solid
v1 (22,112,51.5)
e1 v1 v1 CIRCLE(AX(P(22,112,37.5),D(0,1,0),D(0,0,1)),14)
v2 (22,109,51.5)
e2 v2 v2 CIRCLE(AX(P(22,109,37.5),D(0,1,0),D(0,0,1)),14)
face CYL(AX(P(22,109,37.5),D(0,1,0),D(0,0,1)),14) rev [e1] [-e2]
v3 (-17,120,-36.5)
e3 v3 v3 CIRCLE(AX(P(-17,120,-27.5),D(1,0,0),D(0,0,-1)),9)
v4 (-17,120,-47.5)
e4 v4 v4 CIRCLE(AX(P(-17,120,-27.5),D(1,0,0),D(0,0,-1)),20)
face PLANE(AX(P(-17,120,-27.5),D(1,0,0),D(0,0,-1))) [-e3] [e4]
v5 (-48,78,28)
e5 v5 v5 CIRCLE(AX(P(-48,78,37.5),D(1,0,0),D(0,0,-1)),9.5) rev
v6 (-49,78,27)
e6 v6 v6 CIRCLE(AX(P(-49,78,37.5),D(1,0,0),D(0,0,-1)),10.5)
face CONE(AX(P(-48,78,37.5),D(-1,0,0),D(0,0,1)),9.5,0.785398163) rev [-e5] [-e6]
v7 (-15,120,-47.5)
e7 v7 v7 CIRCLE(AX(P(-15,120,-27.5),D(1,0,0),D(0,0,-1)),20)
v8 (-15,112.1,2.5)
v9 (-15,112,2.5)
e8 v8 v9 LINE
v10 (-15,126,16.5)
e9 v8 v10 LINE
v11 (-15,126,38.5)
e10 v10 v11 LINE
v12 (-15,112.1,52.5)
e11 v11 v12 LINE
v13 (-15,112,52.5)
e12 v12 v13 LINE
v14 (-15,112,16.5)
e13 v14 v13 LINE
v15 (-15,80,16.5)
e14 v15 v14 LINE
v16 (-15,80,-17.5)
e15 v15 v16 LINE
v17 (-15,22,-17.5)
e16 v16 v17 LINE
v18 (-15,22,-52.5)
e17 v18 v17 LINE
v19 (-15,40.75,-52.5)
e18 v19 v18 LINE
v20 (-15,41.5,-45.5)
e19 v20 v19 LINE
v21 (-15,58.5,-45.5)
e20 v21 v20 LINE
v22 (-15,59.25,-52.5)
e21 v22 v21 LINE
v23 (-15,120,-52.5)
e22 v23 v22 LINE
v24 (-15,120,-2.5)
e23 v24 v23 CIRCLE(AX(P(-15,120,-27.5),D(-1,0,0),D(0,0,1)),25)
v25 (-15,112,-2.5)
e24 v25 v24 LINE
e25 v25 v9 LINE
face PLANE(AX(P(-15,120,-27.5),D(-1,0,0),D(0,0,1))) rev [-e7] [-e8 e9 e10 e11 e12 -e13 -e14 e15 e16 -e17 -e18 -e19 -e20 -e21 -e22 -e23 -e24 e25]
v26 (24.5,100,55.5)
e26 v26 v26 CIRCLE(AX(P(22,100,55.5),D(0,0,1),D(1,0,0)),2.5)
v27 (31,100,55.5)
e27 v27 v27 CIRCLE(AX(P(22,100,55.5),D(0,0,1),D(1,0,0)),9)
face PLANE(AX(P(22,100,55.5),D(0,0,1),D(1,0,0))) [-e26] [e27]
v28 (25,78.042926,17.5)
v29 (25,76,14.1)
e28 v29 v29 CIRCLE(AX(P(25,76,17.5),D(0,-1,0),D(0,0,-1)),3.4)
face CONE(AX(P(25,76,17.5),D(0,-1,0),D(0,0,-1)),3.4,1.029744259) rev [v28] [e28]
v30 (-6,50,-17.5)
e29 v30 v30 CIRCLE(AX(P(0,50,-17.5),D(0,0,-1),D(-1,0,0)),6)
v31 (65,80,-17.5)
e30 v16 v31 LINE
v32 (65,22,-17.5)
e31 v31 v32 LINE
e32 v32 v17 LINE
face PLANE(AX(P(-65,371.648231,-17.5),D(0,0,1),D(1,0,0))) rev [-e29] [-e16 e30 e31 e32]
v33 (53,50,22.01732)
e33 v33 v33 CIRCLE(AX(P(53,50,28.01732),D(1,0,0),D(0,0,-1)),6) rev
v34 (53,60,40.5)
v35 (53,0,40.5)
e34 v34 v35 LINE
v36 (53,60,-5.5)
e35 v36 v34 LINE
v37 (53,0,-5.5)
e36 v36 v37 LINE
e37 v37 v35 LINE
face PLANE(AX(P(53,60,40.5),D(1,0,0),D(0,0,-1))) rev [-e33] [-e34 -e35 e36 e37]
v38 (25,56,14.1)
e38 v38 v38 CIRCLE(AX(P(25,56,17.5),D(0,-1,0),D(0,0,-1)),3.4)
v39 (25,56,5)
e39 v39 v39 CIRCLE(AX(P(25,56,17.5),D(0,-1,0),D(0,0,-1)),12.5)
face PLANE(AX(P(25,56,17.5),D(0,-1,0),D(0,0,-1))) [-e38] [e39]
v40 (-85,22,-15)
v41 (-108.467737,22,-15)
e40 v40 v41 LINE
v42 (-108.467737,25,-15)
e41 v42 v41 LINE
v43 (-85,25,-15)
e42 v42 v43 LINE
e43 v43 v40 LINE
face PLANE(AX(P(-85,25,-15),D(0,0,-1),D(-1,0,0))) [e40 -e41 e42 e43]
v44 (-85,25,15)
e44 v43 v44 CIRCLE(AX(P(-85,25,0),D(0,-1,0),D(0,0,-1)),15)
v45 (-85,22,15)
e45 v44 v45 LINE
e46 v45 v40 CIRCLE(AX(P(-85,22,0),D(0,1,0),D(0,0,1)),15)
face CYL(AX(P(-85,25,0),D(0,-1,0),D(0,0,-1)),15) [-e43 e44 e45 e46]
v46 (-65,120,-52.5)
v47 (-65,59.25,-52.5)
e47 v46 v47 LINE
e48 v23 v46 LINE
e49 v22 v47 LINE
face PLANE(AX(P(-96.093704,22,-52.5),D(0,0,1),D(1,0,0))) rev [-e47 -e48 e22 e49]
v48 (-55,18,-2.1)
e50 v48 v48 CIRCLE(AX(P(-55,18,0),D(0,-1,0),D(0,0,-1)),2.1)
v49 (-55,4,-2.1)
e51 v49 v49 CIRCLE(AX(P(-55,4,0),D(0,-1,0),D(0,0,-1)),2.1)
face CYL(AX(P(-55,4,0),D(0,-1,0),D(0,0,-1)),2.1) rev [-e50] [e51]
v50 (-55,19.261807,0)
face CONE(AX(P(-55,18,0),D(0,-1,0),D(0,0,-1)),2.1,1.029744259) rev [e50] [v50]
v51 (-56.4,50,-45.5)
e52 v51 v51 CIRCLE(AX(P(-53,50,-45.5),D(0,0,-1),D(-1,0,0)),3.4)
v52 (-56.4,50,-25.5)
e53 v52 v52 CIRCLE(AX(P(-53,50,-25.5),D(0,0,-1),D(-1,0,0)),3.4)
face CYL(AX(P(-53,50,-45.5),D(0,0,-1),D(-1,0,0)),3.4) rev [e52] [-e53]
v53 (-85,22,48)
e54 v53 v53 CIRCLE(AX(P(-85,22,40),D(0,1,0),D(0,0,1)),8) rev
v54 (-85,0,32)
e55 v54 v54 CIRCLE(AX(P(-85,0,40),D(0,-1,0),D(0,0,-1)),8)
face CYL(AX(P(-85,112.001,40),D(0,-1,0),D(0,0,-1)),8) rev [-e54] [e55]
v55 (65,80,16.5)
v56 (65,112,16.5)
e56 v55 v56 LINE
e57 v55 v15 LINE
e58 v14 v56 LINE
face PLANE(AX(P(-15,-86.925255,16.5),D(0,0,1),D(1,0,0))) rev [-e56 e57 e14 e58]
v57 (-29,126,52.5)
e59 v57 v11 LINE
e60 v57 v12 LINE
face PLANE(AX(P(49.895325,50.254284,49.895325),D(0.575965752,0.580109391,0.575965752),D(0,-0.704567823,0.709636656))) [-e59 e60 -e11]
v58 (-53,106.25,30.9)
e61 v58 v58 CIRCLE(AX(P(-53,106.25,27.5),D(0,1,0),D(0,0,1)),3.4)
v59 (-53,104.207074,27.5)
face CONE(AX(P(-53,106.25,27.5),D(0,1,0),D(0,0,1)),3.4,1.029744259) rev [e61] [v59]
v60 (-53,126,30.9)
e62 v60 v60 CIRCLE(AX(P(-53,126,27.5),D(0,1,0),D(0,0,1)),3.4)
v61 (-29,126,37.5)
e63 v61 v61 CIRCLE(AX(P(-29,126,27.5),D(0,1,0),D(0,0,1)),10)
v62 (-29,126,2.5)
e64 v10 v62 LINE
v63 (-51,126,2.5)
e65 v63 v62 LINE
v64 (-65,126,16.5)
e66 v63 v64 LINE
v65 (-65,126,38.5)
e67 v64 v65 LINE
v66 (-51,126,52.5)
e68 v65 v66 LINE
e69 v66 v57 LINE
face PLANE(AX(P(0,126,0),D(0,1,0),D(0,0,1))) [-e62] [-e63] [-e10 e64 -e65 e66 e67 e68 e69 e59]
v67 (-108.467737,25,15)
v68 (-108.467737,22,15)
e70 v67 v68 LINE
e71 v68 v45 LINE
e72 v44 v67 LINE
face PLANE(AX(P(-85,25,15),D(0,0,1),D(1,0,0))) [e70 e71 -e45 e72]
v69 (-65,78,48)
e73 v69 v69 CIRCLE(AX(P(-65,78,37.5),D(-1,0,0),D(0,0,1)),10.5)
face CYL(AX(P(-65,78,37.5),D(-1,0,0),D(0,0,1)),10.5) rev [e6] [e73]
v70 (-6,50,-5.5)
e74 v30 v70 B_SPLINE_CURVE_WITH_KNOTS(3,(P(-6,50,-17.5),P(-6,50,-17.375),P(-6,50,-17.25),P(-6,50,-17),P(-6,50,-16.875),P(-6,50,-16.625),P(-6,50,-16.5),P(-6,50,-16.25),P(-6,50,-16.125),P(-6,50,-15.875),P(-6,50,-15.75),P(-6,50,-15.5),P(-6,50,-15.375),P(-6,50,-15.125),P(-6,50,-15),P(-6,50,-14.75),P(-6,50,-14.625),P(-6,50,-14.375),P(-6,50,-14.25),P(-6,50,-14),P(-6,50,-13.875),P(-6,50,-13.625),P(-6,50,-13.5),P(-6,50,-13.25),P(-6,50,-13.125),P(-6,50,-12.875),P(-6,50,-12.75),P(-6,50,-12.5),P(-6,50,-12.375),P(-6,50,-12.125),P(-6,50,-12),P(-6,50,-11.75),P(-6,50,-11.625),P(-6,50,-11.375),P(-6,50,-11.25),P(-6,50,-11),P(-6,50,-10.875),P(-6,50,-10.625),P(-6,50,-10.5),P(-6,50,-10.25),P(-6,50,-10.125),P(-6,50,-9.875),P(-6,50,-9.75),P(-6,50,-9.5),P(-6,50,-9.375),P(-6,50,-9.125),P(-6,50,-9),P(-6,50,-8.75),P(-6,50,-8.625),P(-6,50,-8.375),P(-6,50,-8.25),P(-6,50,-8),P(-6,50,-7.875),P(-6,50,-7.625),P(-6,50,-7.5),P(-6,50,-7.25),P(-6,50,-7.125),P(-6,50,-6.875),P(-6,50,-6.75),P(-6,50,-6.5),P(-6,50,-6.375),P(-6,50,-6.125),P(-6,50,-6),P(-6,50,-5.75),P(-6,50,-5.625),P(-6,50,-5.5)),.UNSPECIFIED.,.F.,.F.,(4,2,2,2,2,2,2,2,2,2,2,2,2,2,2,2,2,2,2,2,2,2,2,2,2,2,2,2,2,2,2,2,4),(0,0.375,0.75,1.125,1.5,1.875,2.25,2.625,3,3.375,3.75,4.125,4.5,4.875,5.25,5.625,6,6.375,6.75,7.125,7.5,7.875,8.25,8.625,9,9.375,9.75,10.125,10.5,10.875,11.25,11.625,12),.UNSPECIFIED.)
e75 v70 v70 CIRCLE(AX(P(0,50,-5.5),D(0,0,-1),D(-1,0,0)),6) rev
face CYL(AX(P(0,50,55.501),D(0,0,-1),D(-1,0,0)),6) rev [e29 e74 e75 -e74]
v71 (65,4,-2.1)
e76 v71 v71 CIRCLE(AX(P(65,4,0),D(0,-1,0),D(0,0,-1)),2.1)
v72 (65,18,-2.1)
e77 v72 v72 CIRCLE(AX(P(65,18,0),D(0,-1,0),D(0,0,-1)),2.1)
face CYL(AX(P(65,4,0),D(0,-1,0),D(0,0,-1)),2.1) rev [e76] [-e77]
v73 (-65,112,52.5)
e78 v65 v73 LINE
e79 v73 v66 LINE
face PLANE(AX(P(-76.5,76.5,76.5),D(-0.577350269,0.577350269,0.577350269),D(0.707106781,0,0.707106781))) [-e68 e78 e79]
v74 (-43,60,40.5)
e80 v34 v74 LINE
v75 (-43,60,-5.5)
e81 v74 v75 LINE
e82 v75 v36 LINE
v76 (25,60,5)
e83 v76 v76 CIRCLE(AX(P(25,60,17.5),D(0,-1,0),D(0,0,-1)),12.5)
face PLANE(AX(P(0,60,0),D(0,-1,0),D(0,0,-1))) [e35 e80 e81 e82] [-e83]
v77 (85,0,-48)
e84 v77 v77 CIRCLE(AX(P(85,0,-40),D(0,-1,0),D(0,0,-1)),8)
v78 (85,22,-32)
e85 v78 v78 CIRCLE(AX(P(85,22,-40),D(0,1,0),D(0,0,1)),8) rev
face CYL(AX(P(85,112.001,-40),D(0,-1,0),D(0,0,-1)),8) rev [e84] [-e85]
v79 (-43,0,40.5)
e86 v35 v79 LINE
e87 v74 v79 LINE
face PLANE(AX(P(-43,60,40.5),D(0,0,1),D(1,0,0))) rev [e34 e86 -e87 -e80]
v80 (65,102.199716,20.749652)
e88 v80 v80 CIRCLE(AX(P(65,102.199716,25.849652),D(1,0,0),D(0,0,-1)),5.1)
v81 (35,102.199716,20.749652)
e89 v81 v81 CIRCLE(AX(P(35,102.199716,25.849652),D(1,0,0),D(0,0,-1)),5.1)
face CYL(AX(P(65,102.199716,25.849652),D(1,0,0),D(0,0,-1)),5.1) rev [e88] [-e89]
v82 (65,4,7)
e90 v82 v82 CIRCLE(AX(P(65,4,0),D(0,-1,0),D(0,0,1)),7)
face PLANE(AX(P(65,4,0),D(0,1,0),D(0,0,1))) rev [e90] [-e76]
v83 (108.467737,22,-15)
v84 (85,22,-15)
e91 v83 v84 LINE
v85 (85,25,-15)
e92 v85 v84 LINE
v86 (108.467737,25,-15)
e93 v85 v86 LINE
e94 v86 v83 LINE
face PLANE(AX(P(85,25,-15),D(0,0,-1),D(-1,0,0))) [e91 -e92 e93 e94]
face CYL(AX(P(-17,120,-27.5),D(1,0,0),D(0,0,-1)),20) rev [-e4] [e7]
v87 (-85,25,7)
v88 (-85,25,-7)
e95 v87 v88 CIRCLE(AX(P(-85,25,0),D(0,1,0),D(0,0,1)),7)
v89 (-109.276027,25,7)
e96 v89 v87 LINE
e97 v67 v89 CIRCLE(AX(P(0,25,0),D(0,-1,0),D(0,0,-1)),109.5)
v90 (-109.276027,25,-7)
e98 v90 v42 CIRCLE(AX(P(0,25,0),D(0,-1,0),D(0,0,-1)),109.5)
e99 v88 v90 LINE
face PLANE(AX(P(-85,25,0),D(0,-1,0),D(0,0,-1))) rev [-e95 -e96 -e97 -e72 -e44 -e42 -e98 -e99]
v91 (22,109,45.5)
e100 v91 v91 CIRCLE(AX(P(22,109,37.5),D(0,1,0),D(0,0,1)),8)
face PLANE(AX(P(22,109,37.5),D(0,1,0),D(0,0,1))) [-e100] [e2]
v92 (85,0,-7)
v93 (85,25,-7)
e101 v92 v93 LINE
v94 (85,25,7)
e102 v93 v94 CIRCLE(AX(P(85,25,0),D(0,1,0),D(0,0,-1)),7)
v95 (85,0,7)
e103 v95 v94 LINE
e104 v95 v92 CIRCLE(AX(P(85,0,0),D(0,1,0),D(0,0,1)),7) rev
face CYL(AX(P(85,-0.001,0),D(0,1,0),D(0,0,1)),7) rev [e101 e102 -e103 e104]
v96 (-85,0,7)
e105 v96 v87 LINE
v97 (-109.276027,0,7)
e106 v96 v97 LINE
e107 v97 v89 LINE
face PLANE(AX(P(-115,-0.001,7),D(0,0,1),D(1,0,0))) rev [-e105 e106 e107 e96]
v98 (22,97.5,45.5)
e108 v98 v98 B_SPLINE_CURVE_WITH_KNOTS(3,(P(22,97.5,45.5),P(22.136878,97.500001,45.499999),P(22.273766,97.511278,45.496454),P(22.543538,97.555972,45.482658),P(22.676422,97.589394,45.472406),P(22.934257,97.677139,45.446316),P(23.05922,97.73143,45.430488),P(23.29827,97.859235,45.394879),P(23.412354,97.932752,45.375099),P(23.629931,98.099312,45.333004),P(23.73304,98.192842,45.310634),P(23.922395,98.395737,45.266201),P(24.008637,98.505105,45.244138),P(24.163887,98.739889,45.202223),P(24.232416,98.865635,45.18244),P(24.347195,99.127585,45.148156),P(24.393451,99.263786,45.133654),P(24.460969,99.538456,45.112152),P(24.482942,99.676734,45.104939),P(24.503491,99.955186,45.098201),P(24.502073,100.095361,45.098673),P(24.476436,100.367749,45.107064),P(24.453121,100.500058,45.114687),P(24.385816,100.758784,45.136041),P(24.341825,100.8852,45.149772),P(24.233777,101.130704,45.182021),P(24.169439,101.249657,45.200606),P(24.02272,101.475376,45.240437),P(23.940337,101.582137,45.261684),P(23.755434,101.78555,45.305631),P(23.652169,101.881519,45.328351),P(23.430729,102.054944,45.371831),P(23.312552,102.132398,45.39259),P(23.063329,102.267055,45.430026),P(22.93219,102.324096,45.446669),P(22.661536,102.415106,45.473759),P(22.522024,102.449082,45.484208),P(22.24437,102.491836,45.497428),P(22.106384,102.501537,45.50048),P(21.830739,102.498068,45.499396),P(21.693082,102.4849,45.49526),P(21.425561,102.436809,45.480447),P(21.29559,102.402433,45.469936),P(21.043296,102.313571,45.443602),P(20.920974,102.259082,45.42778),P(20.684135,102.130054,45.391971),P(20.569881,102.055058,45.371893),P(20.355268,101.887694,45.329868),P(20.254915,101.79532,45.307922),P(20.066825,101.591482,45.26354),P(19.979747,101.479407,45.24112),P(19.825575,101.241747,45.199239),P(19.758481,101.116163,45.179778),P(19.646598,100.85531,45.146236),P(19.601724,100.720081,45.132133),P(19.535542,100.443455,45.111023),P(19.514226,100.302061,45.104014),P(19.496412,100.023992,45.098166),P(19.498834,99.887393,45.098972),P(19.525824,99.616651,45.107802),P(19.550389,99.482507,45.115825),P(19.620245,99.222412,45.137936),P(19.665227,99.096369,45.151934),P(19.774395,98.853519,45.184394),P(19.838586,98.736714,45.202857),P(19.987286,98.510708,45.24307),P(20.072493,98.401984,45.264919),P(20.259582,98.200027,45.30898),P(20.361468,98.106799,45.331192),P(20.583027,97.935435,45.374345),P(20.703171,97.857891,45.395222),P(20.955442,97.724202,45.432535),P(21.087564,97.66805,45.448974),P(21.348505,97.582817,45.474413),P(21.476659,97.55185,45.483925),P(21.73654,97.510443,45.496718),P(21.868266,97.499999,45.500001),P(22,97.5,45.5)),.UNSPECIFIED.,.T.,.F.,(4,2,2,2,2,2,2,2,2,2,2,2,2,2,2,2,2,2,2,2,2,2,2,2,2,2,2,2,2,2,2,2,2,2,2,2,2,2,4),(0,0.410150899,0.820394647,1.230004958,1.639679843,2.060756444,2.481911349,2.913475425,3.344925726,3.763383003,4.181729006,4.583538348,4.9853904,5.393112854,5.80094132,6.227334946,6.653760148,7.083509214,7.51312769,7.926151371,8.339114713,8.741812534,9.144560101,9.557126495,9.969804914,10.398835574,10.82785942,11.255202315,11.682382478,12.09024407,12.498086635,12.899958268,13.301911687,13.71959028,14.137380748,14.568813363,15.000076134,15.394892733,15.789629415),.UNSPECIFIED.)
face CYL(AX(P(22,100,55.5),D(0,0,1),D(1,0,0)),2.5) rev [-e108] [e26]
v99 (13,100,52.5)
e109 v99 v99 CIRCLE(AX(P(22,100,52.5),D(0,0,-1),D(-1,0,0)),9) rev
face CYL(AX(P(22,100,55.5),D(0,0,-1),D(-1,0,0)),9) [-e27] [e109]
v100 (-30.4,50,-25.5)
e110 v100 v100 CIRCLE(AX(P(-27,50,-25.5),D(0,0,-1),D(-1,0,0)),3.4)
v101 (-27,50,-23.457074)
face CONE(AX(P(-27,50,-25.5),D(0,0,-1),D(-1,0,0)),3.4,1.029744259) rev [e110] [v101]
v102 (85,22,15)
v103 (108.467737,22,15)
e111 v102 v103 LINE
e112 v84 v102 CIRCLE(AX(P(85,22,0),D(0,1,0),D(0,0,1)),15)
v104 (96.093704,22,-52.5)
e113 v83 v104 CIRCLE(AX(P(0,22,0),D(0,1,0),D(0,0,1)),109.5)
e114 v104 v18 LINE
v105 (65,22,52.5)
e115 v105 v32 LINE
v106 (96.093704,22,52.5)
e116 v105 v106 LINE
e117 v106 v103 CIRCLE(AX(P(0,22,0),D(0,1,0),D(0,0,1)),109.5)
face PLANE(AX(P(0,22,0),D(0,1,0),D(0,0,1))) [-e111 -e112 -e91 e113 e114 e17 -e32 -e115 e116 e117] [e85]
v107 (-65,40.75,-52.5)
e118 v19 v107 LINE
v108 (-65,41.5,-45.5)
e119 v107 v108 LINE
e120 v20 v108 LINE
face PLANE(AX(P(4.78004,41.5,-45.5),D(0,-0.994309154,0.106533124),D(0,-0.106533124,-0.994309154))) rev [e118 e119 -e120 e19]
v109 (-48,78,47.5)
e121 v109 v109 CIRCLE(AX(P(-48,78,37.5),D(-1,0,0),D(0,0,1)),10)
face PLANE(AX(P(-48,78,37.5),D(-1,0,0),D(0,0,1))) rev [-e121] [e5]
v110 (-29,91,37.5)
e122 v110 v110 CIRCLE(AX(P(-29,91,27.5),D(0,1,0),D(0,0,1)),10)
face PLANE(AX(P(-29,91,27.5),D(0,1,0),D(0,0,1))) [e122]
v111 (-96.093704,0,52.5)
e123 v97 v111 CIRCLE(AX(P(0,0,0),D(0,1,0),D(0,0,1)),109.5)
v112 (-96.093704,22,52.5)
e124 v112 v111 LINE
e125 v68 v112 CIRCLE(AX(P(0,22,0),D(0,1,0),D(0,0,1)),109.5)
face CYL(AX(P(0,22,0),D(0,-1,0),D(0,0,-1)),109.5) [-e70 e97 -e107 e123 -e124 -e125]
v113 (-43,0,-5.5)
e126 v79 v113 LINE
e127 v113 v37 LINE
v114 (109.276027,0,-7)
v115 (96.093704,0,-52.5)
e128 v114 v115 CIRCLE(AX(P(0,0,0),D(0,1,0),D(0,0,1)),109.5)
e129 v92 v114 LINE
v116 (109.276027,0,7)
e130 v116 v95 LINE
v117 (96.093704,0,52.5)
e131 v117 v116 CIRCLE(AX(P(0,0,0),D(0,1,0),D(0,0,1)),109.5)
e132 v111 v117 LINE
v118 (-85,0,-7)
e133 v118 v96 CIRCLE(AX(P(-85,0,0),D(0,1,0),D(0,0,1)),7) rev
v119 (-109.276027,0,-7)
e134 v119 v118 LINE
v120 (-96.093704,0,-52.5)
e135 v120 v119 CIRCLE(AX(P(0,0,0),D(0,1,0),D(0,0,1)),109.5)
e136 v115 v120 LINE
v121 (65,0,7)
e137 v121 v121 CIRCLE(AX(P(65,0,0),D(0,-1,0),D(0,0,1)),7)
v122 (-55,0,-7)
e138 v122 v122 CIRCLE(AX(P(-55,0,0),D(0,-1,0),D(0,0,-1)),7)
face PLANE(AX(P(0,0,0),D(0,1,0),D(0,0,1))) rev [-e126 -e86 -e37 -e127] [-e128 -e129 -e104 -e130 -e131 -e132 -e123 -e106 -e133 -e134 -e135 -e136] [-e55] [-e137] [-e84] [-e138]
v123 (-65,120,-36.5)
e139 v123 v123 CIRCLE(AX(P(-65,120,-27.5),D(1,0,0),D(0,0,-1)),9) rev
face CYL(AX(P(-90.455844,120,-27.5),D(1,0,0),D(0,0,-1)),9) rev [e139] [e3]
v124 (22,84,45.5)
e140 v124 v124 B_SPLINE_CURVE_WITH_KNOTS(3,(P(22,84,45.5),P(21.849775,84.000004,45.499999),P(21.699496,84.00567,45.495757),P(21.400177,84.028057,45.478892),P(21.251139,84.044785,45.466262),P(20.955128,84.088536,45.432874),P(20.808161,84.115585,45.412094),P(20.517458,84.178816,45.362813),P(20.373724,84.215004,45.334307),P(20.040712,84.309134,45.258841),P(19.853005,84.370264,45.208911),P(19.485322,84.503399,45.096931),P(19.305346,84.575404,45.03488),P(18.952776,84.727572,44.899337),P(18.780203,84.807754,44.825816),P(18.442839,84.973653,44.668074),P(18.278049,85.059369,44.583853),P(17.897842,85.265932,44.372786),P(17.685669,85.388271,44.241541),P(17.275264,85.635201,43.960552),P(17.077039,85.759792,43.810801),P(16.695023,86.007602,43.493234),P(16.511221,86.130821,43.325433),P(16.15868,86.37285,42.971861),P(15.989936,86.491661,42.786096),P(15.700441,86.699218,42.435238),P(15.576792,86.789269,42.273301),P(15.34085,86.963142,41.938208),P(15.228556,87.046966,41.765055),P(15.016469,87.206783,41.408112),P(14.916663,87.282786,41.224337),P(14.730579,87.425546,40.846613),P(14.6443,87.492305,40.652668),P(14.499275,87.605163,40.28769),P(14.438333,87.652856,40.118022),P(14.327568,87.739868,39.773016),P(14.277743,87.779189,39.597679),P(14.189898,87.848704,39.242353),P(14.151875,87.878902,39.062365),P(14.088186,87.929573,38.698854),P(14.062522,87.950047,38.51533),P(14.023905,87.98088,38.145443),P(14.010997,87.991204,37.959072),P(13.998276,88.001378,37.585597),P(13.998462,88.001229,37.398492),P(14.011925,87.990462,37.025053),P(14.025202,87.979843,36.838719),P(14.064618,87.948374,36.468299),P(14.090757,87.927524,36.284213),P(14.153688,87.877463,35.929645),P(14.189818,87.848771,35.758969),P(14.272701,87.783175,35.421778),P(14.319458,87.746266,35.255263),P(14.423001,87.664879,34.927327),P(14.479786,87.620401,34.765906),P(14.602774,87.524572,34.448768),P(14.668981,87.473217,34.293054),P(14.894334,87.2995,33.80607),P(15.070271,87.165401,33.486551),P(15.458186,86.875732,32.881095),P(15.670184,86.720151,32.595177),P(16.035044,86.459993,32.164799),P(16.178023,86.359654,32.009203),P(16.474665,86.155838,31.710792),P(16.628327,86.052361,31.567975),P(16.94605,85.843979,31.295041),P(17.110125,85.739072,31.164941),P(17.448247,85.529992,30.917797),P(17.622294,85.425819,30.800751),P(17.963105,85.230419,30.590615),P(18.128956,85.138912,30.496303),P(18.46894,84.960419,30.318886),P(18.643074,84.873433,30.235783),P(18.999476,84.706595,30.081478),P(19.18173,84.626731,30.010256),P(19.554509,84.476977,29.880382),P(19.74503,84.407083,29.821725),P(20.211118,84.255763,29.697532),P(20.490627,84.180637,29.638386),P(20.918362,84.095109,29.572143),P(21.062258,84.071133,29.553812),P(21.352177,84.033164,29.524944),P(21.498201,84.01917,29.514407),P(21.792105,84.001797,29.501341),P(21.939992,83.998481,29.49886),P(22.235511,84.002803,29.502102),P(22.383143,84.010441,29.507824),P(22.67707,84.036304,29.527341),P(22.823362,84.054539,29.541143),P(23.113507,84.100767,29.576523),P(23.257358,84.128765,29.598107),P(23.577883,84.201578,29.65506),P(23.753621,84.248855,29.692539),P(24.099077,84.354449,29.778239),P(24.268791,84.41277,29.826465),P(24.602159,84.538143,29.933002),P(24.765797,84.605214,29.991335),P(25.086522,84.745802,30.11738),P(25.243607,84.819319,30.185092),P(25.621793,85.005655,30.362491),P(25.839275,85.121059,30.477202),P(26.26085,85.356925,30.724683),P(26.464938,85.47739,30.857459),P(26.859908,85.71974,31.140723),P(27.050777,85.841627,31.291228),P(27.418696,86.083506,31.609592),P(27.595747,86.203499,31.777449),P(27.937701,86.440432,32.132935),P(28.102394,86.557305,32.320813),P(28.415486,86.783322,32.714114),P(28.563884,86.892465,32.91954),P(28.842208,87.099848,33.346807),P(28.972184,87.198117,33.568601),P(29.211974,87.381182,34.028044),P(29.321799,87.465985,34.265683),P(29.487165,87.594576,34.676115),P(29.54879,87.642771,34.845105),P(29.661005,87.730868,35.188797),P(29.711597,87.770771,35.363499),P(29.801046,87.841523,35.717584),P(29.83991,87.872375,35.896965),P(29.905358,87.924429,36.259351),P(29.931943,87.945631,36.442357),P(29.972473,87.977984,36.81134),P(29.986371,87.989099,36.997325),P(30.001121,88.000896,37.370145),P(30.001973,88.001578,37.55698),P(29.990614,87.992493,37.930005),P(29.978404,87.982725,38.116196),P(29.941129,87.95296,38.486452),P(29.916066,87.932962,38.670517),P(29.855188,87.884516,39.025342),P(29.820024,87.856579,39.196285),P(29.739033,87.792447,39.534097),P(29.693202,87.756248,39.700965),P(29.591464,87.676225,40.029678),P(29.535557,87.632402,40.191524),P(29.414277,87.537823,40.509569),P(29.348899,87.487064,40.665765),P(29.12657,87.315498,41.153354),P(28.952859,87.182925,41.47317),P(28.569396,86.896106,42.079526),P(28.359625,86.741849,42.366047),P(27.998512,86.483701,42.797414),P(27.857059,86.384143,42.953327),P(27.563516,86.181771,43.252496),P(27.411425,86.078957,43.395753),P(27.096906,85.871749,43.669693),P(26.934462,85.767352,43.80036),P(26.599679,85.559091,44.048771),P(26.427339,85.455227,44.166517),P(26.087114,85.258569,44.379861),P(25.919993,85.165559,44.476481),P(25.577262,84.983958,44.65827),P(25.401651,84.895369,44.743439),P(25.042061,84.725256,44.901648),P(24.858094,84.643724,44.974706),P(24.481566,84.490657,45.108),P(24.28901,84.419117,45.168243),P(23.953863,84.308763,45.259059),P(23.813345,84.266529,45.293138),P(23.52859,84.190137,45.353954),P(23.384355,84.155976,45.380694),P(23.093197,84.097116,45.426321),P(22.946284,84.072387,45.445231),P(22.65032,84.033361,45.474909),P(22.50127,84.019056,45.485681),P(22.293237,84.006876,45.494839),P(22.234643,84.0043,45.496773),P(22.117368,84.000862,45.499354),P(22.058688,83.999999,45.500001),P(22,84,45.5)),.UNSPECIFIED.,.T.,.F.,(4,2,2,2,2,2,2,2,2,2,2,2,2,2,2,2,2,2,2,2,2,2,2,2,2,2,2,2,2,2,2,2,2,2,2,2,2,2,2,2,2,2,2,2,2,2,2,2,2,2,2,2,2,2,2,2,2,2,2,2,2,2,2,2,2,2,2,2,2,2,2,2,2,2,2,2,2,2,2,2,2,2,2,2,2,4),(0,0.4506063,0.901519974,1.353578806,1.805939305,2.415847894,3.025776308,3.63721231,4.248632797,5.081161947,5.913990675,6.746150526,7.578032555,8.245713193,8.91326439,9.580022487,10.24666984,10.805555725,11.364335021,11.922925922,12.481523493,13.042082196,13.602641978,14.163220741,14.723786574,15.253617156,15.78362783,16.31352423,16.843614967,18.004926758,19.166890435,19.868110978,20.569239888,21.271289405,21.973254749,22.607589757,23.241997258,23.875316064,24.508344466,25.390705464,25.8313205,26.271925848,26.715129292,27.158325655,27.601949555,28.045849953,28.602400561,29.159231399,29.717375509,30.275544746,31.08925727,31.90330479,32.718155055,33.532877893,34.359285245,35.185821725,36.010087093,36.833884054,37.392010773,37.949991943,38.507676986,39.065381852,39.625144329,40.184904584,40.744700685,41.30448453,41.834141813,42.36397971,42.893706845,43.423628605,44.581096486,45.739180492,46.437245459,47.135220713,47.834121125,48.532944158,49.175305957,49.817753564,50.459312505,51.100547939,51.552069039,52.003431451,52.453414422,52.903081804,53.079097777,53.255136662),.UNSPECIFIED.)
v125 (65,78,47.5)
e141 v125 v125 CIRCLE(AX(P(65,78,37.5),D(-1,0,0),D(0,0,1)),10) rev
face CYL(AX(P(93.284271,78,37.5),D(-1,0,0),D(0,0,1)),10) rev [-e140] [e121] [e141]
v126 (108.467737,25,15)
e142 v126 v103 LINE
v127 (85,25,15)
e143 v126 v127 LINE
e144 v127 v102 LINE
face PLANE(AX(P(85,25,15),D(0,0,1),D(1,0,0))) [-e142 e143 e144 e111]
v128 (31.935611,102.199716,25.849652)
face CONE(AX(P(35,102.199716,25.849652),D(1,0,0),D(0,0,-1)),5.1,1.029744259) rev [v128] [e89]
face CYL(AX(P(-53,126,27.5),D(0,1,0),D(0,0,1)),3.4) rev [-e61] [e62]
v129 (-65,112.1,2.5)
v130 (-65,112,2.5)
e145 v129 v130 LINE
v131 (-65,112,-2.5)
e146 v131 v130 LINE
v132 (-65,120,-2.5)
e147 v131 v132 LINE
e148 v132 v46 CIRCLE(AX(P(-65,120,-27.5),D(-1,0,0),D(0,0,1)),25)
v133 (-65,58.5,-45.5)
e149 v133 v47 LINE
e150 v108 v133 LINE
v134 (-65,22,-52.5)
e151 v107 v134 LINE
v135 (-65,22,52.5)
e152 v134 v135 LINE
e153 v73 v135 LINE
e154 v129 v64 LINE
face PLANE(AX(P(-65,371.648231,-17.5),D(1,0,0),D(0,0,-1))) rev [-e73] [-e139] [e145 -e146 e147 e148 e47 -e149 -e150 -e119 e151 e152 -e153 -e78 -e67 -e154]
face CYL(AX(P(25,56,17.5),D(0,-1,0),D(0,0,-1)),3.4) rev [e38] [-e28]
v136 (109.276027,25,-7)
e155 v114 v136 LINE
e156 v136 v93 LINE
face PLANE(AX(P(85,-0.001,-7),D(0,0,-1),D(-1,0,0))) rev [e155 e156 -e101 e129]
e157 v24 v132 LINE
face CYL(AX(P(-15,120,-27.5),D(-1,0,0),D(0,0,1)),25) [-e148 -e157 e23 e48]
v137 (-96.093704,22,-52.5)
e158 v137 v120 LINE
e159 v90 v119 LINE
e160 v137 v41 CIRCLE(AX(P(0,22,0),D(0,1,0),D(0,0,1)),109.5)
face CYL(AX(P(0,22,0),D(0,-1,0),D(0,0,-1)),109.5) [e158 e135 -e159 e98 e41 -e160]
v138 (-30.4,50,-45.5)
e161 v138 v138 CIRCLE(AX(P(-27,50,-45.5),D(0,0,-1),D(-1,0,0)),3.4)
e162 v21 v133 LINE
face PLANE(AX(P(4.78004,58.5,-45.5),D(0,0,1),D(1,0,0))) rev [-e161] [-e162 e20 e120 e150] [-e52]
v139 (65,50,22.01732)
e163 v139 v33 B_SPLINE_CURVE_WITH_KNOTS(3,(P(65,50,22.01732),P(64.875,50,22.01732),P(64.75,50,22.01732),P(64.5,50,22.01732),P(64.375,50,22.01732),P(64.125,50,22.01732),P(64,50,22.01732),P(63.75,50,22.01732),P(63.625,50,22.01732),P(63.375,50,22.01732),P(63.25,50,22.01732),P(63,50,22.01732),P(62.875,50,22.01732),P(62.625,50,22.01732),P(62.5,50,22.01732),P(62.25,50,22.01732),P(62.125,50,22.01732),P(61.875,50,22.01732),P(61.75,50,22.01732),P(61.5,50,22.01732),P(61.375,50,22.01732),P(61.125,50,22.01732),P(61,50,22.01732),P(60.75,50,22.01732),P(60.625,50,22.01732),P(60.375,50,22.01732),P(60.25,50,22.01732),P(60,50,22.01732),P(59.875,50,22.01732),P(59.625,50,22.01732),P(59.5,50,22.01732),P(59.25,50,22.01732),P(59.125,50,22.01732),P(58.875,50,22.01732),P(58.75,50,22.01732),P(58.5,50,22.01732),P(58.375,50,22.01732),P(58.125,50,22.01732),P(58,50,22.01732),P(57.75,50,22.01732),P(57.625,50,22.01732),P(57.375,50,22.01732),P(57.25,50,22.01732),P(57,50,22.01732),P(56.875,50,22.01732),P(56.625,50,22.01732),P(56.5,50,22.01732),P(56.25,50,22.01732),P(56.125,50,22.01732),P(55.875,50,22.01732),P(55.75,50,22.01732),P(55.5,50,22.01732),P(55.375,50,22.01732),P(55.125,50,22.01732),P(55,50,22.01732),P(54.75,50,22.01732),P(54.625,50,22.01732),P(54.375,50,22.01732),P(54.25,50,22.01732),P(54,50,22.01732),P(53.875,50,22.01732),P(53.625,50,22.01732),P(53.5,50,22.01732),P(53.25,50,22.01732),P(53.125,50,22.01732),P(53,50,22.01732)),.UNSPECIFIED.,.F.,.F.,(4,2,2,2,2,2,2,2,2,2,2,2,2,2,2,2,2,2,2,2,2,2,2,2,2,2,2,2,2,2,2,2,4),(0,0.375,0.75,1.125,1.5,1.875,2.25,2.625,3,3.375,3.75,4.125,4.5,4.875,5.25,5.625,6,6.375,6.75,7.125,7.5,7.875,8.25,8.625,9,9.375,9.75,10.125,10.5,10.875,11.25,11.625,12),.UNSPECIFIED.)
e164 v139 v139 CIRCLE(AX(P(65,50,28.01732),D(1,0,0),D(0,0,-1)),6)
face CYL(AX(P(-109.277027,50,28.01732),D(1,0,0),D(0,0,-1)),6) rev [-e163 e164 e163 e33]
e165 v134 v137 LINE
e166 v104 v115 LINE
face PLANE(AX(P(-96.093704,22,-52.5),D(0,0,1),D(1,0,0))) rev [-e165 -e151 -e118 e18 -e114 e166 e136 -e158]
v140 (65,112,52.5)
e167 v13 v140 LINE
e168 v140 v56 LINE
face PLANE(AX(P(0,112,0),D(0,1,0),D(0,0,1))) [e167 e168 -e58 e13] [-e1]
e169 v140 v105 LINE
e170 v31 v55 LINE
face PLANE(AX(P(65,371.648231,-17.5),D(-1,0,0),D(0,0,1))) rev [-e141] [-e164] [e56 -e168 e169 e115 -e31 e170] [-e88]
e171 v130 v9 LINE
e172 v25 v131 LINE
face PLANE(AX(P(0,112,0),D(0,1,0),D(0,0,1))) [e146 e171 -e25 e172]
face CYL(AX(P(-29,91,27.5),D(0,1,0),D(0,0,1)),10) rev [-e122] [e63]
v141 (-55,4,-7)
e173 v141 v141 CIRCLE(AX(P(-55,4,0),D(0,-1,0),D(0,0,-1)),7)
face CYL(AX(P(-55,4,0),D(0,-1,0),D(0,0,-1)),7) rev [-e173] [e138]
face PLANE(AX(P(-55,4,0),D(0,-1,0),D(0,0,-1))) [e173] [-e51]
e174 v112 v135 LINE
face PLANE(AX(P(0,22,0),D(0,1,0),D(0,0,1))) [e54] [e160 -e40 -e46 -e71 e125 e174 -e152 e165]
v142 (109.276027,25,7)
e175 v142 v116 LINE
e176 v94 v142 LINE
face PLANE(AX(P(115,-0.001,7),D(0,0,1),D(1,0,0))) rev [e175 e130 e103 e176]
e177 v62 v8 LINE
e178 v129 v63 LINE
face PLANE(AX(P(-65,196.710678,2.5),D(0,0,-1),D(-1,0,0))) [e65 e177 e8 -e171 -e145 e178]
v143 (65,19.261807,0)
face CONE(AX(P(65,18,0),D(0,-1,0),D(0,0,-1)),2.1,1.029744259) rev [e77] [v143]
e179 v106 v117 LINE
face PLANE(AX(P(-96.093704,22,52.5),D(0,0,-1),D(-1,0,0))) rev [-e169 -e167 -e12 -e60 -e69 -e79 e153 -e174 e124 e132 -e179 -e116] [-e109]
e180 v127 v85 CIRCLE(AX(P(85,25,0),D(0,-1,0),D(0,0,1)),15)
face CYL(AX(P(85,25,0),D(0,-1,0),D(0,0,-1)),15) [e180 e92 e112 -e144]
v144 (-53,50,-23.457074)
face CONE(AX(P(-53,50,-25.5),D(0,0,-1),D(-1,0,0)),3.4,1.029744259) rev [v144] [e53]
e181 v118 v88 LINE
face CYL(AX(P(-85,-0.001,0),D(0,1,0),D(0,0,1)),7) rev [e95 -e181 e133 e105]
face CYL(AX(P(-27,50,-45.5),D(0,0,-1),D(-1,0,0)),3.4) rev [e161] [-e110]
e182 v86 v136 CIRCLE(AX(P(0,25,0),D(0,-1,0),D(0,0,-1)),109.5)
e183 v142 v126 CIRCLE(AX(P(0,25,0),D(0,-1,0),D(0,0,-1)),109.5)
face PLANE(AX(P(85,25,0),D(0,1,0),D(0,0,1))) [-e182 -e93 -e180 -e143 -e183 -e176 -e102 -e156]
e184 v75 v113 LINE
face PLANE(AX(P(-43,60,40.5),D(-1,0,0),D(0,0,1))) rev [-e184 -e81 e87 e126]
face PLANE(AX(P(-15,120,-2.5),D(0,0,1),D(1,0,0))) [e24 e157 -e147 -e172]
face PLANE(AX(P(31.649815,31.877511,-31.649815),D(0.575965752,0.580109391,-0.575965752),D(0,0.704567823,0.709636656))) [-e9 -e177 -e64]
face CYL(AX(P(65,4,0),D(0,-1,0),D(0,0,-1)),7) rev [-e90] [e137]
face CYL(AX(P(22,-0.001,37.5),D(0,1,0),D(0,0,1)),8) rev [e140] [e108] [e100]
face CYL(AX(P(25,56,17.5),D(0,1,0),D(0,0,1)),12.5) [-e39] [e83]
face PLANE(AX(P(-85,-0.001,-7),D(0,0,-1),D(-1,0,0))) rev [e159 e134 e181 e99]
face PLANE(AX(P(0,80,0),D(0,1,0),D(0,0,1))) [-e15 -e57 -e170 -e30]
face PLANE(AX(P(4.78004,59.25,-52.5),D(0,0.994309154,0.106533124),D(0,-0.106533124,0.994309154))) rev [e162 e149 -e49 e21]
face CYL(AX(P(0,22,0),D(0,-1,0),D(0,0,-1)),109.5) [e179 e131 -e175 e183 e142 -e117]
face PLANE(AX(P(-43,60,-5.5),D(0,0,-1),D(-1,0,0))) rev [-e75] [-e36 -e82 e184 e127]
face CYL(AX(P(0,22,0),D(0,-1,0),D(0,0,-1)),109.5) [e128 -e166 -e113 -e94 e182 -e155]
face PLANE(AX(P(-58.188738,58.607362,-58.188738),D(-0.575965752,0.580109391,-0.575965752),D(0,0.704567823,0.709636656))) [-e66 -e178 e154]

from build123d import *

# Parameters (mm, degrees)
EXTRUDE_1_DEPTH          = 22
SKETCH_2_W               = 130
SKETCH_2_H               = 70
EXTRUDE_2_DEPTH          = 90
CUT_EXTRUDE_2_REACH      = 167.198
SKETCH_4_R               = 8
EXTRUDE_3_DEPTH          = 50
SKETCH_6_W               = 50
SKETCH_6_H               = 50
EXTRUDE_4_DEPTH          = 14
CHAMFER_START            = -142
CHAMFER_1_OUTLINE_W      = 20
CHAMFER_1_OUTLINE_H      = 22
CHAMFER_1_DEPTH          = 9.498113221
CHAMFER_START_2          = 86.62897838
CHAMFER_2_DEPTH          = 9.37102162
CHAMFER_START_3          = -134.90192828
CHAMFER_3_DEPTH          = 45.34578231
CHAMFER_START_4          = 32.785213501
CHAMFER_4_DEPTH          = 35.552289575
SKETCH_8_W               = 80
SKETCH_8_H               = 34
CUT_EXTRUDE_3_DEPTH      = 32
SKETCH_9_R               = 20
CUT_EXTRUDE_4_DEPTH      = 2
SKETCH_10_R              = 9
CUT_EXTRUDE_5_DEPTH      = 48
CUT_EXTRUDE_6_DEPTH      = 50
HOLE_WIZARD_M24_2_D      = 21
HOLE_WIZARD_M24_2_DEPTH  = 17
CHAMFER_5_SIZE           = 1
SKETCH_17_R              = 10
CUT_EXTRUDE_7_DEPTH      = 113
SKETCH_18_R              = 14
CUT_EXTRUDE_8_DEPTH      = 3
CUT_EXTRUDE_9_REACH      = 165.179
CUT_EXTRUDE_9_END_RADIUS = 10
SKETCH_19_R              = 8
EXTRUDE_5_DEPTH          = 25
CUT_EXTRUDE_10_REACH     = 172.723
SKETCH_3_W               = 96
SKETCH_3_H               = 46
CUT_EXTRUDE_1_DEPTH      = 60
SKETCH_22_R              = 12.5
EXTRUDE_6_DEPTH          = 4
HOLE_WIZARD_M8_1_D       = 6.8
HOLE_WIZARD_M8_1_DEPTH   = 20
HOLE_WIZARD_M8_1_TIP     = 2.042926105
SKETCH_24_R              = 9
EXTRUDE_7_DEPTH          = 3
SKETCH_28_R              = 10
CUT_EXTRUDE_11_DEPTH     = 35
HOLE_WIZARD_M6_1_REACH   = 199.224
HOLE_WIZARD_M6_1_BORE_R  = 2.5
CUT_EXTRUDE_12_REACH     = 197.692
SKETCH_39_R              = 6
SKETCH_40_R              = 7
CUT_EXTRUDE_13_DEPTH     = 4
HOLE_WIZARD_M5_1_D       = 4.2
HOLE_WIZARD_M5_1_DEPTH   = 14
HOLE_WIZARD_M5_1_TIP     = 1.2618073
CUT_EXTRUDE_14_REACH     = 235.404
SKETCH_44_R              = 6


with BuildPart() as part:
    # 草图1 → 凸台-拉伸1 (new body)
    with BuildSketch(Plane(origin=(0, 0, 0), x_dir=(1, 0, 0), z_dir=(0, 1, 0))):
        with BuildLine():
            Line((-96.093704268, 52.5), (96.093704268, 52.5))
            ThreePointArc((96.093704268, 52.5), (109.5, 0), (96.093704268, -52.5))
            Line((96.093704268, -52.5), (-96.093704268, -52.5))
            ThreePointArc((-96.093704268, -52.5), (-109.5, 0), (-96.093704268, 52.5))
        make_face()
    extrude(amount=EXTRUDE_1_DEPTH)

    # 草图2 → 凸台-拉伸2 (add)
    with BuildSketch(Plane(origin=(0, 22, 0), x_dir=(1, 0, 0), z_dir=(0, 1, 0))):
        with Locations((0, -17.5)):
            Rectangle(SKETCH_2_W, SKETCH_2_H)
    extrude(amount=EXTRUDE_2_DEPTH)

    # 草图4 → 切除-拉伸2 (cut, up to next)
    with BuildSketch(Plane.XZ, mode=Mode.PRIVATE) as cut_extrude_2_sk1:
        with Locations(Location((85, -40, 0), (0, 0, 270))):
            Circle(SKETCH_4_R)
    cut_extrude_2_tool1 = extrude(cut_extrude_2_sk1.sketch, amount=-CUT_EXTRUDE_2_REACH, mode=Mode.PRIVATE) & part.part
    # 草图4 → 切除-拉伸2 (cut, up to next)
    with BuildSketch(Plane.XZ, mode=Mode.PRIVATE) as cut_extrude_2_sk2:
        with Locations(Location((-85, 40, 0), (0, 0, 270))):
            Circle(SKETCH_4_R)
    cut_extrude_2_tool2 = extrude(cut_extrude_2_sk2.sketch, amount=-CUT_EXTRUDE_2_REACH, mode=Mode.PRIVATE) & part.part
    add(cut_extrude_2_tool1.solids().sort_by_distance((85, 0, -40))[0], mode=Mode.SUBTRACT)
    add(cut_extrude_2_tool2.solids().sort_by_distance((-85, 0, 40))[0], mode=Mode.SUBTRACT)

    # 草图5 → 凸台-拉伸3 (add)
    with BuildSketch(Plane.ZY.offset(65)):
        with BuildLine():
            Line((52.5, 22), (-52.5, 22))
            Line((-52.5, 22), (-52.5, 120))
            ThreePointArc((-52.5, 120), (-27.5, 145), (-2.5, 120))
            Line((-2.5, 120), (-2.5, 112))
            Line((-2.5, 112), (52.5, 112))
            Line((52.5, 112), (52.5, 22))
        make_face()
    extrude(amount=-EXTRUDE_3_DEPTH)

    # 草图6 → 凸台-拉伸4 (add)
    with BuildSketch(Plane(origin=(0, 112, 0), x_dir=(1, 0, 0), z_dir=(0, 1, 0))):
        with Locations((-40, -27.5)):
            Rectangle(SKETCH_6_W, SKETCH_6_H)
    extrude(amount=EXTRUDE_4_DEPTH)

    # 倒角1: read off the stored shape, not the designer's step
    # 倒角1 outline → 倒角1 (cut)
    with BuildSketch(Plane(origin=(0, 0, 0), x_dir=(0.8164965809277258, 0.40824829046386313, 0.40824829046386313), z_dir=(0.5773502691896258, -0.5773502691896258, -0.5773502691896258)).offset(CHAMFER_START)):
        with Locations((23, -52)):
            Rectangle(CHAMFER_1_OUTLINE_W, CHAMFER_1_OUTLINE_H)
    extrude(amount=CHAMFER_1_DEPTH, mode=Mode.SUBTRACT)

    # 倒角2: read off the stored shape, not the designer's step
    # 倒角2 outline → 倒角2 (cut)
    with BuildSketch(Plane(origin=(0, 0, 0), x_dir=(0.8174738237346374, -0.40872641016099387, -0.40580693580270144), z_dir=(0.5759657520275584, 0.5801093905313534, 0.5759657520275585)).offset(CHAMFER_START_2)):
        Polygon((-79.385202065, 41.726128481), (-79.385202065, 61.454534398), (-96.511132698, 51.519621216), align=None)
    extrude(amount=CHAMFER_2_DEPTH, mode=Mode.SUBTRACT)

    # 倒角3: read off the stored shape, not the designer's step
    # 倒角3 outline → 倒角3 (cut)
    with BuildSketch(Plane(origin=(0, 0, 0), x_dir=(0.7045678226077661, 0.7096366558639369, 0), z_dir=(0.7096366558639368, -0.7045678226077663, 0)).offset(CHAMFER_START_3)):
        Polygon((78.8457013, 16.5), (68.981751783, 2.5), (80, 2.5), (80, 18), (79.902553034, 18), align=None)
    extrude(amount=CHAMFER_3_DEPTH, mode=Mode.SUBTRACT)

    # 倒角4: read off the stored shape, not the designer's step
    # 倒角4 outline → 倒角4 (cut)
    with BuildSketch(Plane(origin=(0, 0, 0), x_dir=(0.7045678226077663, -0.7096366558639366, 0), z_dir=(0.7096366558639366, 0.7045678226077662, 0)).offset(CHAMFER_START_4)):
        Polygon((-135.211127108, -16.5), (-125.347177592, -2.5), (-137, -2.5), (-137, -18), (-136.267978842, -18), align=None)
    extrude(amount=CHAMFER_4_DEPTH, mode=Mode.SUBTRACT)

    # 草图8 → 切除-拉伸3 (cut)
    with BuildSketch(Plane(origin=(0, 112, 0), x_dir=(1, 0, 0), z_dir=(0, 1, 0))):
        with Locations((25, 0.5)):
            Rectangle(SKETCH_8_W, SKETCH_8_H)
    extrude(amount=-CUT_EXTRUDE_3_DEPTH, mode=Mode.SUBTRACT)

    # 草图9 → 切除-拉伸4 (cut)
    with BuildSketch(Plane(origin=(-15, 0, 0), x_dir=(0, 0, -1), z_dir=(1, 0, 0))):
        with Locations((27.5, 120)):
            Circle(SKETCH_9_R)
    extrude(amount=-CUT_EXTRUDE_4_DEPTH, mode=Mode.SUBTRACT)

    # 草图10 → 切除-拉伸5 (cut)
    with BuildSketch(Plane(origin=(-17, 0, 0), x_dir=(0, 0, -1), z_dir=(1, 0, 0))):
        with Locations((27.5, 120)):
            Circle(SKETCH_10_R)
    extrude(amount=-CUT_EXTRUDE_5_DEPTH, mode=Mode.SUBTRACT)

    # 草图11 → 切除-拉伸6 (cut)
    with BuildSketch(Plane.ZY.offset(65)):
        Polygon((-52.5, 40.75), (-52.5, 59.25), (-45.5, 58.5), (-45.5, 41.5), align=None)
    extrude(amount=-CUT_EXTRUDE_6_DEPTH, mode=Mode.SUBTRACT)

    # M24 螺纹孔2
    with Locations(Plane.ZY.offset(65)):
        with Locations((37.5, 78)):
            Hole(HOLE_WIZARD_M24_2_D / 2, depth=HOLE_WIZARD_M24_2_DEPTH)

    # 倒角5
    chamfer_5_edges = [part.edges().sort_by_distance(p)[0] for p in [
        (-48, 78, 48),
    ]]
    chamfer(chamfer_5_edges, length=CHAMFER_5_SIZE)

    # 草图17 → 切除-拉伸7 (cut)
    with BuildSketch(Plane.ZY.offset(48)):
        with Locations((37.5, 78)):
            Circle(SKETCH_17_R)
    extrude(amount=-CUT_EXTRUDE_7_DEPTH, mode=Mode.SUBTRACT)

    # 草图18 → 切除-拉伸8 (cut)
    with BuildSketch(Plane(origin=(0, 112, 0), x_dir=(1, 0, 0), z_dir=(0, 1, 0))):
        with Locations(Location((22, -37.5, 0), (0, 0, 270))):
            Circle(SKETCH_18_R)
    extrude(amount=-CUT_EXTRUDE_8_DEPTH, mode=Mode.SUBTRACT)

    # 切除-拉伸9: up to this cylinder (the profile starts outside it)
    cut_extrude_9_end = Plane(origin=(22, 78, 37.5), z_dir=(-1, 0, 0)) * Cylinder(CUT_EXTRUDE_9_END_RADIUS, 351.358, mode=Mode.PRIVATE)
    # 草图19 → 切除-拉伸9 (cut, up to the surface)
    with BuildSketch(Plane(origin=(0, 109, 0), x_dir=(1, 0, 0), z_dir=(0, 1, 0)), mode=Mode.PRIVATE) as cut_extrude_9_sk1:
        with Locations(Location((22, -37.5, 0), (0, 0, 270))):
            Circle(SKETCH_19_R)
    cut_extrude_9_tool1 = extrude(cut_extrude_9_sk1.sketch, amount=-CUT_EXTRUDE_9_REACH, mode=Mode.PRIVATE) - cut_extrude_9_end
    add(cut_extrude_9_tool1.solids().sort_by_distance((22, 109, 37.5))[0], mode=Mode.SUBTRACT)

    # 草图20 → 凸台-拉伸5 (add)
    with BuildSketch(Plane.XZ):
        with BuildLine():
            Line((-85, 15), (-108.467737139, 15))
            ThreePointArc((-108.467737139, 15), (-109.5, 0), (-108.467737139, -15))
            Line((-108.467737139, -15), (-85, -15))
            ThreePointArc((-85, -15), (-70, 0), (-85, 15))
        make_face()
        with BuildLine():
            Line((85, 15), (108.467737139, 15))
            ThreePointArc((108.467737139, 15), (109.5, 0), (108.467737139, -15))
            Line((108.467737139, -15), (85, -15))
            ThreePointArc((85, -15), (70, 0), (85, 15))
        make_face()
    extrude(amount=-EXTRUDE_5_DEPTH)

    # 草图21 → 切除-拉伸10 (cut, up to next)
    with BuildSketch(Plane(origin=(0, 25, 0), x_dir=(1, 0, 0), z_dir=(0, 1, 0)), mode=Mode.PRIVATE) as cut_extrude_10_sk1:
        with BuildLine():
            Line((-85, 7), (-115, 7))
            Line((-115, 7), (-115, -7))
            Line((-115, -7), (-85, -7))
            ThreePointArc((-85, -7), (-78, 0), (-85, 7))
        make_face()
    cut_extrude_10_tool1 = extrude(cut_extrude_10_sk1.sketch, amount=-CUT_EXTRUDE_10_REACH, mode=Mode.PRIVATE) & part.part
    # 草图21 → 切除-拉伸10 (cut, up to next)
    with BuildSketch(Plane(origin=(0, 25, 0), x_dir=(1, 0, 0), z_dir=(0, 1, 0)), mode=Mode.PRIVATE) as cut_extrude_10_sk2:
        with BuildLine():
            Line((115, -7), (85, -7))
            ThreePointArc((85, -7), (78, 0), (85, 7))
            Line((85, 7), (115, 7))
            Line((115, 7), (115, -7))
        make_face()
    cut_extrude_10_tool2 = extrude(cut_extrude_10_sk2.sketch, amount=-CUT_EXTRUDE_10_REACH, mode=Mode.PRIVATE) & part.part
    add(cut_extrude_10_tool1.solids().sort_by_distance((-97.216724, 25, 0))[0], mode=Mode.SUBTRACT)
    add(cut_extrude_10_tool2.solids().sort_by_distance((97.216724, 25, 0))[0], mode=Mode.SUBTRACT)

    # 草图3 → 切除-拉伸1 (cut)
    with BuildSketch(Plane.XZ):
        with Locations((5, 17.5)):
            Rectangle(SKETCH_3_W, SKETCH_3_H)
    extrude(amount=-CUT_EXTRUDE_1_DEPTH, mode=Mode.SUBTRACT)

    # 草图22 → 凸台-拉伸6 (add)
    with BuildSketch(Plane.XZ.offset(-60)):
        with Locations(Location((25, 17.5, 0), (0, 0, 270))):
            Circle(SKETCH_22_R)
    extrude(amount=EXTRUDE_6_DEPTH)

    # M8 螺纹孔1
    with Locations(Plane(origin=(25, 56, 17.5), x_dir=(0, 0, -1), z_dir=(0, -1, 0))):
        with Locations((0, 0)):
            Hole(HOLE_WIZARD_M8_1_D / 2, depth=HOLE_WIZARD_M8_1_DEPTH)
            with Locations((0, 0, -(HOLE_WIZARD_M8_1_DEPTH + HOLE_WIZARD_M8_1_TIP / 2))):  # 118° drill point
                Cone(0, HOLE_WIZARD_M8_1_D / 2, HOLE_WIZARD_M8_1_TIP, mode=Mode.SUBTRACT)

    # 草图24 → 凸台-拉伸7 (add)
    with BuildSketch(Plane.XY.offset(52.5)):
        with Locations(Location((22, 100, 0), (0, 0, 180))):
            Circle(SKETCH_24_R)
    extrude(amount=EXTRUDE_7_DEPTH)

    # M8 螺纹孔2: read off the stored shape, not the designer's step
    # M8 螺纹孔2 outline → M8 螺纹孔2 (revolve, cut)
    with BuildSketch(Plane(origin=(-53, 0, 27.5), x_dir=(1, 0, 0), z_dir=(0, 0, 1))):
        Polygon((0, 126), (0, 104.207073895), (3.4, 106.25), (3.4, 126), align=None)
    revolve(axis=Axis((-53, 0, 27.5), (0, 1, 0)), mode=Mode.SUBTRACT)

    # 草图28 → 切除-拉伸11 (cut)
    with BuildSketch(Plane(origin=(0, 126, 0), x_dir=(1, 0, 0), z_dir=(0, 1, 0))):
        with Locations(Location((-29, -27.5, 0), (0, 0, 270))):
            Circle(SKETCH_28_R)
    extrude(amount=-CUT_EXTRUDE_11_DEPTH, mode=Mode.SUBTRACT)

    # M12 螺纹孔1: read off the stored shape, not the designer's step
    # M12 螺纹孔1 outline → M12 螺纹孔1 (revolve, cut)
    with BuildSketch(Plane(origin=(0, 102.19971589, 25.849651596), x_dir=(0, 1, 0), z_dir=(0, 0, -1))):
        Polygon((0, 65), (0, 31.935610843), (5.1, 35), (5.1, 65), align=None)
    revolve(axis=Axis((0, 102.19971589, 25.849651596), (1, 0, 0)), mode=Mode.SUBTRACT)

    # M6 螺纹孔1 bore (on position points) → M6 螺纹孔1 (cut, up to next)
    with BuildSketch(Plane(origin=(22, 100, 55.5), x_dir=(1, 0, 0), z_dir=(0, 0, 1)), mode=Mode.PRIVATE) as hole_wizard_m6_1_sk1:
        Circle(HOLE_WIZARD_M6_1_BORE_R)
    hole_wizard_m6_1_tool1 = extrude(hole_wizard_m6_1_sk1.sketch, amount=-HOLE_WIZARD_M6_1_REACH, mode=Mode.PRIVATE) & part.part
    add(hole_wizard_m6_1_tool1.solids().sort_by_distance((22, 100, 55.5))[0], mode=Mode.SUBTRACT)

    # M8 螺纹孔4: read off the stored shape, not the designer's step
    # M8 螺纹孔4 outline → M8 螺纹孔4 (revolve, cut)
    with BuildSketch(Plane(origin=(-53, 50, 0), x_dir=(1, 0, 0), z_dir=(0, -1, 0))):
        Polygon((3.4, -25.5), (0, -23.457073895), (0, -45.5), (3.4, -45.5), align=None)
    revolve(axis=Axis((-53, 50, 0), (0, 0, 1)), mode=Mode.SUBTRACT)

    # Hole Wizard M8 _4 2 outline → Hole Wizard M8 _4 2 (revolve, cut)
    with BuildSketch(Plane(origin=(-27, 50, 0), x_dir=(1, 0, 0), z_dir=(0, -1, 0))):
        Polygon((3.4, -25.5), (0, -23.457073895), (0, -45.5), (3.4, -45.5), align=None)
    revolve(axis=Axis((-27, 50, 0), (0, 0, 1)), mode=Mode.SUBTRACT)

    # 草图39 → 切除-拉伸12 (cut, up to next)
    with BuildSketch(Plane(origin=(0, 0, -17.5), x_dir=(-1, 0, 0), z_dir=(0, 0, -1)), mode=Mode.PRIVATE) as cut_extrude_12_sk1:
        with Locations((0, 50)):
            Circle(SKETCH_39_R)
    cut_extrude_12_tool1 = extrude(cut_extrude_12_sk1.sketch, amount=-CUT_EXTRUDE_12_REACH, mode=Mode.PRIVATE) & part.part
    add(cut_extrude_12_tool1.solids().sort_by_distance((0, 50, -17.5))[0], mode=Mode.SUBTRACT)

    # 草图40 → 切除-拉伸13 (cut)
    with BuildSketch(Plane.XZ):
        with Locations(Location((-55, 0, 0), (0, 0, 270))):
            Circle(SKETCH_40_R)
        with Locations(Location((65, 0, 0), (0, 0, 90))):
            Circle(SKETCH_40_R)
    extrude(amount=-CUT_EXTRUDE_13_DEPTH, mode=Mode.SUBTRACT)

    # M5 螺纹孔1
    with Locations(Plane(origin=(-55, 4, 0), x_dir=(0, 0, -1), z_dir=(0, -1, 0))):
        with Locations((0, 0), (0, 120)):
            Hole(HOLE_WIZARD_M5_1_D / 2, depth=HOLE_WIZARD_M5_1_DEPTH)
            with Locations((0, 0, -(HOLE_WIZARD_M5_1_DEPTH + HOLE_WIZARD_M5_1_TIP / 2))):  # 118° drill point
                Cone(0, HOLE_WIZARD_M5_1_D / 2, HOLE_WIZARD_M5_1_TIP, mode=Mode.SUBTRACT)

    # 草图44 → 切除-拉伸14 (cut, up to next)
    with BuildSketch(Plane(origin=(65, 0, 0), x_dir=(0, 0, -1), z_dir=(1, 0, 0)), mode=Mode.PRIVATE) as cut_extrude_14_sk1:
        with Locations((-28.017319601, 50)):
            Circle(SKETCH_44_R)
    cut_extrude_14_tool1 = extrude(cut_extrude_14_sk1.sketch, amount=-CUT_EXTRUDE_14_REACH, mode=Mode.PRIVATE) & part.part
    add(cut_extrude_14_tool1.solids().sort_by_distance((65, 50, 28.01732))[0], mode=Mode.SUBTRACT)


solid = part.part
